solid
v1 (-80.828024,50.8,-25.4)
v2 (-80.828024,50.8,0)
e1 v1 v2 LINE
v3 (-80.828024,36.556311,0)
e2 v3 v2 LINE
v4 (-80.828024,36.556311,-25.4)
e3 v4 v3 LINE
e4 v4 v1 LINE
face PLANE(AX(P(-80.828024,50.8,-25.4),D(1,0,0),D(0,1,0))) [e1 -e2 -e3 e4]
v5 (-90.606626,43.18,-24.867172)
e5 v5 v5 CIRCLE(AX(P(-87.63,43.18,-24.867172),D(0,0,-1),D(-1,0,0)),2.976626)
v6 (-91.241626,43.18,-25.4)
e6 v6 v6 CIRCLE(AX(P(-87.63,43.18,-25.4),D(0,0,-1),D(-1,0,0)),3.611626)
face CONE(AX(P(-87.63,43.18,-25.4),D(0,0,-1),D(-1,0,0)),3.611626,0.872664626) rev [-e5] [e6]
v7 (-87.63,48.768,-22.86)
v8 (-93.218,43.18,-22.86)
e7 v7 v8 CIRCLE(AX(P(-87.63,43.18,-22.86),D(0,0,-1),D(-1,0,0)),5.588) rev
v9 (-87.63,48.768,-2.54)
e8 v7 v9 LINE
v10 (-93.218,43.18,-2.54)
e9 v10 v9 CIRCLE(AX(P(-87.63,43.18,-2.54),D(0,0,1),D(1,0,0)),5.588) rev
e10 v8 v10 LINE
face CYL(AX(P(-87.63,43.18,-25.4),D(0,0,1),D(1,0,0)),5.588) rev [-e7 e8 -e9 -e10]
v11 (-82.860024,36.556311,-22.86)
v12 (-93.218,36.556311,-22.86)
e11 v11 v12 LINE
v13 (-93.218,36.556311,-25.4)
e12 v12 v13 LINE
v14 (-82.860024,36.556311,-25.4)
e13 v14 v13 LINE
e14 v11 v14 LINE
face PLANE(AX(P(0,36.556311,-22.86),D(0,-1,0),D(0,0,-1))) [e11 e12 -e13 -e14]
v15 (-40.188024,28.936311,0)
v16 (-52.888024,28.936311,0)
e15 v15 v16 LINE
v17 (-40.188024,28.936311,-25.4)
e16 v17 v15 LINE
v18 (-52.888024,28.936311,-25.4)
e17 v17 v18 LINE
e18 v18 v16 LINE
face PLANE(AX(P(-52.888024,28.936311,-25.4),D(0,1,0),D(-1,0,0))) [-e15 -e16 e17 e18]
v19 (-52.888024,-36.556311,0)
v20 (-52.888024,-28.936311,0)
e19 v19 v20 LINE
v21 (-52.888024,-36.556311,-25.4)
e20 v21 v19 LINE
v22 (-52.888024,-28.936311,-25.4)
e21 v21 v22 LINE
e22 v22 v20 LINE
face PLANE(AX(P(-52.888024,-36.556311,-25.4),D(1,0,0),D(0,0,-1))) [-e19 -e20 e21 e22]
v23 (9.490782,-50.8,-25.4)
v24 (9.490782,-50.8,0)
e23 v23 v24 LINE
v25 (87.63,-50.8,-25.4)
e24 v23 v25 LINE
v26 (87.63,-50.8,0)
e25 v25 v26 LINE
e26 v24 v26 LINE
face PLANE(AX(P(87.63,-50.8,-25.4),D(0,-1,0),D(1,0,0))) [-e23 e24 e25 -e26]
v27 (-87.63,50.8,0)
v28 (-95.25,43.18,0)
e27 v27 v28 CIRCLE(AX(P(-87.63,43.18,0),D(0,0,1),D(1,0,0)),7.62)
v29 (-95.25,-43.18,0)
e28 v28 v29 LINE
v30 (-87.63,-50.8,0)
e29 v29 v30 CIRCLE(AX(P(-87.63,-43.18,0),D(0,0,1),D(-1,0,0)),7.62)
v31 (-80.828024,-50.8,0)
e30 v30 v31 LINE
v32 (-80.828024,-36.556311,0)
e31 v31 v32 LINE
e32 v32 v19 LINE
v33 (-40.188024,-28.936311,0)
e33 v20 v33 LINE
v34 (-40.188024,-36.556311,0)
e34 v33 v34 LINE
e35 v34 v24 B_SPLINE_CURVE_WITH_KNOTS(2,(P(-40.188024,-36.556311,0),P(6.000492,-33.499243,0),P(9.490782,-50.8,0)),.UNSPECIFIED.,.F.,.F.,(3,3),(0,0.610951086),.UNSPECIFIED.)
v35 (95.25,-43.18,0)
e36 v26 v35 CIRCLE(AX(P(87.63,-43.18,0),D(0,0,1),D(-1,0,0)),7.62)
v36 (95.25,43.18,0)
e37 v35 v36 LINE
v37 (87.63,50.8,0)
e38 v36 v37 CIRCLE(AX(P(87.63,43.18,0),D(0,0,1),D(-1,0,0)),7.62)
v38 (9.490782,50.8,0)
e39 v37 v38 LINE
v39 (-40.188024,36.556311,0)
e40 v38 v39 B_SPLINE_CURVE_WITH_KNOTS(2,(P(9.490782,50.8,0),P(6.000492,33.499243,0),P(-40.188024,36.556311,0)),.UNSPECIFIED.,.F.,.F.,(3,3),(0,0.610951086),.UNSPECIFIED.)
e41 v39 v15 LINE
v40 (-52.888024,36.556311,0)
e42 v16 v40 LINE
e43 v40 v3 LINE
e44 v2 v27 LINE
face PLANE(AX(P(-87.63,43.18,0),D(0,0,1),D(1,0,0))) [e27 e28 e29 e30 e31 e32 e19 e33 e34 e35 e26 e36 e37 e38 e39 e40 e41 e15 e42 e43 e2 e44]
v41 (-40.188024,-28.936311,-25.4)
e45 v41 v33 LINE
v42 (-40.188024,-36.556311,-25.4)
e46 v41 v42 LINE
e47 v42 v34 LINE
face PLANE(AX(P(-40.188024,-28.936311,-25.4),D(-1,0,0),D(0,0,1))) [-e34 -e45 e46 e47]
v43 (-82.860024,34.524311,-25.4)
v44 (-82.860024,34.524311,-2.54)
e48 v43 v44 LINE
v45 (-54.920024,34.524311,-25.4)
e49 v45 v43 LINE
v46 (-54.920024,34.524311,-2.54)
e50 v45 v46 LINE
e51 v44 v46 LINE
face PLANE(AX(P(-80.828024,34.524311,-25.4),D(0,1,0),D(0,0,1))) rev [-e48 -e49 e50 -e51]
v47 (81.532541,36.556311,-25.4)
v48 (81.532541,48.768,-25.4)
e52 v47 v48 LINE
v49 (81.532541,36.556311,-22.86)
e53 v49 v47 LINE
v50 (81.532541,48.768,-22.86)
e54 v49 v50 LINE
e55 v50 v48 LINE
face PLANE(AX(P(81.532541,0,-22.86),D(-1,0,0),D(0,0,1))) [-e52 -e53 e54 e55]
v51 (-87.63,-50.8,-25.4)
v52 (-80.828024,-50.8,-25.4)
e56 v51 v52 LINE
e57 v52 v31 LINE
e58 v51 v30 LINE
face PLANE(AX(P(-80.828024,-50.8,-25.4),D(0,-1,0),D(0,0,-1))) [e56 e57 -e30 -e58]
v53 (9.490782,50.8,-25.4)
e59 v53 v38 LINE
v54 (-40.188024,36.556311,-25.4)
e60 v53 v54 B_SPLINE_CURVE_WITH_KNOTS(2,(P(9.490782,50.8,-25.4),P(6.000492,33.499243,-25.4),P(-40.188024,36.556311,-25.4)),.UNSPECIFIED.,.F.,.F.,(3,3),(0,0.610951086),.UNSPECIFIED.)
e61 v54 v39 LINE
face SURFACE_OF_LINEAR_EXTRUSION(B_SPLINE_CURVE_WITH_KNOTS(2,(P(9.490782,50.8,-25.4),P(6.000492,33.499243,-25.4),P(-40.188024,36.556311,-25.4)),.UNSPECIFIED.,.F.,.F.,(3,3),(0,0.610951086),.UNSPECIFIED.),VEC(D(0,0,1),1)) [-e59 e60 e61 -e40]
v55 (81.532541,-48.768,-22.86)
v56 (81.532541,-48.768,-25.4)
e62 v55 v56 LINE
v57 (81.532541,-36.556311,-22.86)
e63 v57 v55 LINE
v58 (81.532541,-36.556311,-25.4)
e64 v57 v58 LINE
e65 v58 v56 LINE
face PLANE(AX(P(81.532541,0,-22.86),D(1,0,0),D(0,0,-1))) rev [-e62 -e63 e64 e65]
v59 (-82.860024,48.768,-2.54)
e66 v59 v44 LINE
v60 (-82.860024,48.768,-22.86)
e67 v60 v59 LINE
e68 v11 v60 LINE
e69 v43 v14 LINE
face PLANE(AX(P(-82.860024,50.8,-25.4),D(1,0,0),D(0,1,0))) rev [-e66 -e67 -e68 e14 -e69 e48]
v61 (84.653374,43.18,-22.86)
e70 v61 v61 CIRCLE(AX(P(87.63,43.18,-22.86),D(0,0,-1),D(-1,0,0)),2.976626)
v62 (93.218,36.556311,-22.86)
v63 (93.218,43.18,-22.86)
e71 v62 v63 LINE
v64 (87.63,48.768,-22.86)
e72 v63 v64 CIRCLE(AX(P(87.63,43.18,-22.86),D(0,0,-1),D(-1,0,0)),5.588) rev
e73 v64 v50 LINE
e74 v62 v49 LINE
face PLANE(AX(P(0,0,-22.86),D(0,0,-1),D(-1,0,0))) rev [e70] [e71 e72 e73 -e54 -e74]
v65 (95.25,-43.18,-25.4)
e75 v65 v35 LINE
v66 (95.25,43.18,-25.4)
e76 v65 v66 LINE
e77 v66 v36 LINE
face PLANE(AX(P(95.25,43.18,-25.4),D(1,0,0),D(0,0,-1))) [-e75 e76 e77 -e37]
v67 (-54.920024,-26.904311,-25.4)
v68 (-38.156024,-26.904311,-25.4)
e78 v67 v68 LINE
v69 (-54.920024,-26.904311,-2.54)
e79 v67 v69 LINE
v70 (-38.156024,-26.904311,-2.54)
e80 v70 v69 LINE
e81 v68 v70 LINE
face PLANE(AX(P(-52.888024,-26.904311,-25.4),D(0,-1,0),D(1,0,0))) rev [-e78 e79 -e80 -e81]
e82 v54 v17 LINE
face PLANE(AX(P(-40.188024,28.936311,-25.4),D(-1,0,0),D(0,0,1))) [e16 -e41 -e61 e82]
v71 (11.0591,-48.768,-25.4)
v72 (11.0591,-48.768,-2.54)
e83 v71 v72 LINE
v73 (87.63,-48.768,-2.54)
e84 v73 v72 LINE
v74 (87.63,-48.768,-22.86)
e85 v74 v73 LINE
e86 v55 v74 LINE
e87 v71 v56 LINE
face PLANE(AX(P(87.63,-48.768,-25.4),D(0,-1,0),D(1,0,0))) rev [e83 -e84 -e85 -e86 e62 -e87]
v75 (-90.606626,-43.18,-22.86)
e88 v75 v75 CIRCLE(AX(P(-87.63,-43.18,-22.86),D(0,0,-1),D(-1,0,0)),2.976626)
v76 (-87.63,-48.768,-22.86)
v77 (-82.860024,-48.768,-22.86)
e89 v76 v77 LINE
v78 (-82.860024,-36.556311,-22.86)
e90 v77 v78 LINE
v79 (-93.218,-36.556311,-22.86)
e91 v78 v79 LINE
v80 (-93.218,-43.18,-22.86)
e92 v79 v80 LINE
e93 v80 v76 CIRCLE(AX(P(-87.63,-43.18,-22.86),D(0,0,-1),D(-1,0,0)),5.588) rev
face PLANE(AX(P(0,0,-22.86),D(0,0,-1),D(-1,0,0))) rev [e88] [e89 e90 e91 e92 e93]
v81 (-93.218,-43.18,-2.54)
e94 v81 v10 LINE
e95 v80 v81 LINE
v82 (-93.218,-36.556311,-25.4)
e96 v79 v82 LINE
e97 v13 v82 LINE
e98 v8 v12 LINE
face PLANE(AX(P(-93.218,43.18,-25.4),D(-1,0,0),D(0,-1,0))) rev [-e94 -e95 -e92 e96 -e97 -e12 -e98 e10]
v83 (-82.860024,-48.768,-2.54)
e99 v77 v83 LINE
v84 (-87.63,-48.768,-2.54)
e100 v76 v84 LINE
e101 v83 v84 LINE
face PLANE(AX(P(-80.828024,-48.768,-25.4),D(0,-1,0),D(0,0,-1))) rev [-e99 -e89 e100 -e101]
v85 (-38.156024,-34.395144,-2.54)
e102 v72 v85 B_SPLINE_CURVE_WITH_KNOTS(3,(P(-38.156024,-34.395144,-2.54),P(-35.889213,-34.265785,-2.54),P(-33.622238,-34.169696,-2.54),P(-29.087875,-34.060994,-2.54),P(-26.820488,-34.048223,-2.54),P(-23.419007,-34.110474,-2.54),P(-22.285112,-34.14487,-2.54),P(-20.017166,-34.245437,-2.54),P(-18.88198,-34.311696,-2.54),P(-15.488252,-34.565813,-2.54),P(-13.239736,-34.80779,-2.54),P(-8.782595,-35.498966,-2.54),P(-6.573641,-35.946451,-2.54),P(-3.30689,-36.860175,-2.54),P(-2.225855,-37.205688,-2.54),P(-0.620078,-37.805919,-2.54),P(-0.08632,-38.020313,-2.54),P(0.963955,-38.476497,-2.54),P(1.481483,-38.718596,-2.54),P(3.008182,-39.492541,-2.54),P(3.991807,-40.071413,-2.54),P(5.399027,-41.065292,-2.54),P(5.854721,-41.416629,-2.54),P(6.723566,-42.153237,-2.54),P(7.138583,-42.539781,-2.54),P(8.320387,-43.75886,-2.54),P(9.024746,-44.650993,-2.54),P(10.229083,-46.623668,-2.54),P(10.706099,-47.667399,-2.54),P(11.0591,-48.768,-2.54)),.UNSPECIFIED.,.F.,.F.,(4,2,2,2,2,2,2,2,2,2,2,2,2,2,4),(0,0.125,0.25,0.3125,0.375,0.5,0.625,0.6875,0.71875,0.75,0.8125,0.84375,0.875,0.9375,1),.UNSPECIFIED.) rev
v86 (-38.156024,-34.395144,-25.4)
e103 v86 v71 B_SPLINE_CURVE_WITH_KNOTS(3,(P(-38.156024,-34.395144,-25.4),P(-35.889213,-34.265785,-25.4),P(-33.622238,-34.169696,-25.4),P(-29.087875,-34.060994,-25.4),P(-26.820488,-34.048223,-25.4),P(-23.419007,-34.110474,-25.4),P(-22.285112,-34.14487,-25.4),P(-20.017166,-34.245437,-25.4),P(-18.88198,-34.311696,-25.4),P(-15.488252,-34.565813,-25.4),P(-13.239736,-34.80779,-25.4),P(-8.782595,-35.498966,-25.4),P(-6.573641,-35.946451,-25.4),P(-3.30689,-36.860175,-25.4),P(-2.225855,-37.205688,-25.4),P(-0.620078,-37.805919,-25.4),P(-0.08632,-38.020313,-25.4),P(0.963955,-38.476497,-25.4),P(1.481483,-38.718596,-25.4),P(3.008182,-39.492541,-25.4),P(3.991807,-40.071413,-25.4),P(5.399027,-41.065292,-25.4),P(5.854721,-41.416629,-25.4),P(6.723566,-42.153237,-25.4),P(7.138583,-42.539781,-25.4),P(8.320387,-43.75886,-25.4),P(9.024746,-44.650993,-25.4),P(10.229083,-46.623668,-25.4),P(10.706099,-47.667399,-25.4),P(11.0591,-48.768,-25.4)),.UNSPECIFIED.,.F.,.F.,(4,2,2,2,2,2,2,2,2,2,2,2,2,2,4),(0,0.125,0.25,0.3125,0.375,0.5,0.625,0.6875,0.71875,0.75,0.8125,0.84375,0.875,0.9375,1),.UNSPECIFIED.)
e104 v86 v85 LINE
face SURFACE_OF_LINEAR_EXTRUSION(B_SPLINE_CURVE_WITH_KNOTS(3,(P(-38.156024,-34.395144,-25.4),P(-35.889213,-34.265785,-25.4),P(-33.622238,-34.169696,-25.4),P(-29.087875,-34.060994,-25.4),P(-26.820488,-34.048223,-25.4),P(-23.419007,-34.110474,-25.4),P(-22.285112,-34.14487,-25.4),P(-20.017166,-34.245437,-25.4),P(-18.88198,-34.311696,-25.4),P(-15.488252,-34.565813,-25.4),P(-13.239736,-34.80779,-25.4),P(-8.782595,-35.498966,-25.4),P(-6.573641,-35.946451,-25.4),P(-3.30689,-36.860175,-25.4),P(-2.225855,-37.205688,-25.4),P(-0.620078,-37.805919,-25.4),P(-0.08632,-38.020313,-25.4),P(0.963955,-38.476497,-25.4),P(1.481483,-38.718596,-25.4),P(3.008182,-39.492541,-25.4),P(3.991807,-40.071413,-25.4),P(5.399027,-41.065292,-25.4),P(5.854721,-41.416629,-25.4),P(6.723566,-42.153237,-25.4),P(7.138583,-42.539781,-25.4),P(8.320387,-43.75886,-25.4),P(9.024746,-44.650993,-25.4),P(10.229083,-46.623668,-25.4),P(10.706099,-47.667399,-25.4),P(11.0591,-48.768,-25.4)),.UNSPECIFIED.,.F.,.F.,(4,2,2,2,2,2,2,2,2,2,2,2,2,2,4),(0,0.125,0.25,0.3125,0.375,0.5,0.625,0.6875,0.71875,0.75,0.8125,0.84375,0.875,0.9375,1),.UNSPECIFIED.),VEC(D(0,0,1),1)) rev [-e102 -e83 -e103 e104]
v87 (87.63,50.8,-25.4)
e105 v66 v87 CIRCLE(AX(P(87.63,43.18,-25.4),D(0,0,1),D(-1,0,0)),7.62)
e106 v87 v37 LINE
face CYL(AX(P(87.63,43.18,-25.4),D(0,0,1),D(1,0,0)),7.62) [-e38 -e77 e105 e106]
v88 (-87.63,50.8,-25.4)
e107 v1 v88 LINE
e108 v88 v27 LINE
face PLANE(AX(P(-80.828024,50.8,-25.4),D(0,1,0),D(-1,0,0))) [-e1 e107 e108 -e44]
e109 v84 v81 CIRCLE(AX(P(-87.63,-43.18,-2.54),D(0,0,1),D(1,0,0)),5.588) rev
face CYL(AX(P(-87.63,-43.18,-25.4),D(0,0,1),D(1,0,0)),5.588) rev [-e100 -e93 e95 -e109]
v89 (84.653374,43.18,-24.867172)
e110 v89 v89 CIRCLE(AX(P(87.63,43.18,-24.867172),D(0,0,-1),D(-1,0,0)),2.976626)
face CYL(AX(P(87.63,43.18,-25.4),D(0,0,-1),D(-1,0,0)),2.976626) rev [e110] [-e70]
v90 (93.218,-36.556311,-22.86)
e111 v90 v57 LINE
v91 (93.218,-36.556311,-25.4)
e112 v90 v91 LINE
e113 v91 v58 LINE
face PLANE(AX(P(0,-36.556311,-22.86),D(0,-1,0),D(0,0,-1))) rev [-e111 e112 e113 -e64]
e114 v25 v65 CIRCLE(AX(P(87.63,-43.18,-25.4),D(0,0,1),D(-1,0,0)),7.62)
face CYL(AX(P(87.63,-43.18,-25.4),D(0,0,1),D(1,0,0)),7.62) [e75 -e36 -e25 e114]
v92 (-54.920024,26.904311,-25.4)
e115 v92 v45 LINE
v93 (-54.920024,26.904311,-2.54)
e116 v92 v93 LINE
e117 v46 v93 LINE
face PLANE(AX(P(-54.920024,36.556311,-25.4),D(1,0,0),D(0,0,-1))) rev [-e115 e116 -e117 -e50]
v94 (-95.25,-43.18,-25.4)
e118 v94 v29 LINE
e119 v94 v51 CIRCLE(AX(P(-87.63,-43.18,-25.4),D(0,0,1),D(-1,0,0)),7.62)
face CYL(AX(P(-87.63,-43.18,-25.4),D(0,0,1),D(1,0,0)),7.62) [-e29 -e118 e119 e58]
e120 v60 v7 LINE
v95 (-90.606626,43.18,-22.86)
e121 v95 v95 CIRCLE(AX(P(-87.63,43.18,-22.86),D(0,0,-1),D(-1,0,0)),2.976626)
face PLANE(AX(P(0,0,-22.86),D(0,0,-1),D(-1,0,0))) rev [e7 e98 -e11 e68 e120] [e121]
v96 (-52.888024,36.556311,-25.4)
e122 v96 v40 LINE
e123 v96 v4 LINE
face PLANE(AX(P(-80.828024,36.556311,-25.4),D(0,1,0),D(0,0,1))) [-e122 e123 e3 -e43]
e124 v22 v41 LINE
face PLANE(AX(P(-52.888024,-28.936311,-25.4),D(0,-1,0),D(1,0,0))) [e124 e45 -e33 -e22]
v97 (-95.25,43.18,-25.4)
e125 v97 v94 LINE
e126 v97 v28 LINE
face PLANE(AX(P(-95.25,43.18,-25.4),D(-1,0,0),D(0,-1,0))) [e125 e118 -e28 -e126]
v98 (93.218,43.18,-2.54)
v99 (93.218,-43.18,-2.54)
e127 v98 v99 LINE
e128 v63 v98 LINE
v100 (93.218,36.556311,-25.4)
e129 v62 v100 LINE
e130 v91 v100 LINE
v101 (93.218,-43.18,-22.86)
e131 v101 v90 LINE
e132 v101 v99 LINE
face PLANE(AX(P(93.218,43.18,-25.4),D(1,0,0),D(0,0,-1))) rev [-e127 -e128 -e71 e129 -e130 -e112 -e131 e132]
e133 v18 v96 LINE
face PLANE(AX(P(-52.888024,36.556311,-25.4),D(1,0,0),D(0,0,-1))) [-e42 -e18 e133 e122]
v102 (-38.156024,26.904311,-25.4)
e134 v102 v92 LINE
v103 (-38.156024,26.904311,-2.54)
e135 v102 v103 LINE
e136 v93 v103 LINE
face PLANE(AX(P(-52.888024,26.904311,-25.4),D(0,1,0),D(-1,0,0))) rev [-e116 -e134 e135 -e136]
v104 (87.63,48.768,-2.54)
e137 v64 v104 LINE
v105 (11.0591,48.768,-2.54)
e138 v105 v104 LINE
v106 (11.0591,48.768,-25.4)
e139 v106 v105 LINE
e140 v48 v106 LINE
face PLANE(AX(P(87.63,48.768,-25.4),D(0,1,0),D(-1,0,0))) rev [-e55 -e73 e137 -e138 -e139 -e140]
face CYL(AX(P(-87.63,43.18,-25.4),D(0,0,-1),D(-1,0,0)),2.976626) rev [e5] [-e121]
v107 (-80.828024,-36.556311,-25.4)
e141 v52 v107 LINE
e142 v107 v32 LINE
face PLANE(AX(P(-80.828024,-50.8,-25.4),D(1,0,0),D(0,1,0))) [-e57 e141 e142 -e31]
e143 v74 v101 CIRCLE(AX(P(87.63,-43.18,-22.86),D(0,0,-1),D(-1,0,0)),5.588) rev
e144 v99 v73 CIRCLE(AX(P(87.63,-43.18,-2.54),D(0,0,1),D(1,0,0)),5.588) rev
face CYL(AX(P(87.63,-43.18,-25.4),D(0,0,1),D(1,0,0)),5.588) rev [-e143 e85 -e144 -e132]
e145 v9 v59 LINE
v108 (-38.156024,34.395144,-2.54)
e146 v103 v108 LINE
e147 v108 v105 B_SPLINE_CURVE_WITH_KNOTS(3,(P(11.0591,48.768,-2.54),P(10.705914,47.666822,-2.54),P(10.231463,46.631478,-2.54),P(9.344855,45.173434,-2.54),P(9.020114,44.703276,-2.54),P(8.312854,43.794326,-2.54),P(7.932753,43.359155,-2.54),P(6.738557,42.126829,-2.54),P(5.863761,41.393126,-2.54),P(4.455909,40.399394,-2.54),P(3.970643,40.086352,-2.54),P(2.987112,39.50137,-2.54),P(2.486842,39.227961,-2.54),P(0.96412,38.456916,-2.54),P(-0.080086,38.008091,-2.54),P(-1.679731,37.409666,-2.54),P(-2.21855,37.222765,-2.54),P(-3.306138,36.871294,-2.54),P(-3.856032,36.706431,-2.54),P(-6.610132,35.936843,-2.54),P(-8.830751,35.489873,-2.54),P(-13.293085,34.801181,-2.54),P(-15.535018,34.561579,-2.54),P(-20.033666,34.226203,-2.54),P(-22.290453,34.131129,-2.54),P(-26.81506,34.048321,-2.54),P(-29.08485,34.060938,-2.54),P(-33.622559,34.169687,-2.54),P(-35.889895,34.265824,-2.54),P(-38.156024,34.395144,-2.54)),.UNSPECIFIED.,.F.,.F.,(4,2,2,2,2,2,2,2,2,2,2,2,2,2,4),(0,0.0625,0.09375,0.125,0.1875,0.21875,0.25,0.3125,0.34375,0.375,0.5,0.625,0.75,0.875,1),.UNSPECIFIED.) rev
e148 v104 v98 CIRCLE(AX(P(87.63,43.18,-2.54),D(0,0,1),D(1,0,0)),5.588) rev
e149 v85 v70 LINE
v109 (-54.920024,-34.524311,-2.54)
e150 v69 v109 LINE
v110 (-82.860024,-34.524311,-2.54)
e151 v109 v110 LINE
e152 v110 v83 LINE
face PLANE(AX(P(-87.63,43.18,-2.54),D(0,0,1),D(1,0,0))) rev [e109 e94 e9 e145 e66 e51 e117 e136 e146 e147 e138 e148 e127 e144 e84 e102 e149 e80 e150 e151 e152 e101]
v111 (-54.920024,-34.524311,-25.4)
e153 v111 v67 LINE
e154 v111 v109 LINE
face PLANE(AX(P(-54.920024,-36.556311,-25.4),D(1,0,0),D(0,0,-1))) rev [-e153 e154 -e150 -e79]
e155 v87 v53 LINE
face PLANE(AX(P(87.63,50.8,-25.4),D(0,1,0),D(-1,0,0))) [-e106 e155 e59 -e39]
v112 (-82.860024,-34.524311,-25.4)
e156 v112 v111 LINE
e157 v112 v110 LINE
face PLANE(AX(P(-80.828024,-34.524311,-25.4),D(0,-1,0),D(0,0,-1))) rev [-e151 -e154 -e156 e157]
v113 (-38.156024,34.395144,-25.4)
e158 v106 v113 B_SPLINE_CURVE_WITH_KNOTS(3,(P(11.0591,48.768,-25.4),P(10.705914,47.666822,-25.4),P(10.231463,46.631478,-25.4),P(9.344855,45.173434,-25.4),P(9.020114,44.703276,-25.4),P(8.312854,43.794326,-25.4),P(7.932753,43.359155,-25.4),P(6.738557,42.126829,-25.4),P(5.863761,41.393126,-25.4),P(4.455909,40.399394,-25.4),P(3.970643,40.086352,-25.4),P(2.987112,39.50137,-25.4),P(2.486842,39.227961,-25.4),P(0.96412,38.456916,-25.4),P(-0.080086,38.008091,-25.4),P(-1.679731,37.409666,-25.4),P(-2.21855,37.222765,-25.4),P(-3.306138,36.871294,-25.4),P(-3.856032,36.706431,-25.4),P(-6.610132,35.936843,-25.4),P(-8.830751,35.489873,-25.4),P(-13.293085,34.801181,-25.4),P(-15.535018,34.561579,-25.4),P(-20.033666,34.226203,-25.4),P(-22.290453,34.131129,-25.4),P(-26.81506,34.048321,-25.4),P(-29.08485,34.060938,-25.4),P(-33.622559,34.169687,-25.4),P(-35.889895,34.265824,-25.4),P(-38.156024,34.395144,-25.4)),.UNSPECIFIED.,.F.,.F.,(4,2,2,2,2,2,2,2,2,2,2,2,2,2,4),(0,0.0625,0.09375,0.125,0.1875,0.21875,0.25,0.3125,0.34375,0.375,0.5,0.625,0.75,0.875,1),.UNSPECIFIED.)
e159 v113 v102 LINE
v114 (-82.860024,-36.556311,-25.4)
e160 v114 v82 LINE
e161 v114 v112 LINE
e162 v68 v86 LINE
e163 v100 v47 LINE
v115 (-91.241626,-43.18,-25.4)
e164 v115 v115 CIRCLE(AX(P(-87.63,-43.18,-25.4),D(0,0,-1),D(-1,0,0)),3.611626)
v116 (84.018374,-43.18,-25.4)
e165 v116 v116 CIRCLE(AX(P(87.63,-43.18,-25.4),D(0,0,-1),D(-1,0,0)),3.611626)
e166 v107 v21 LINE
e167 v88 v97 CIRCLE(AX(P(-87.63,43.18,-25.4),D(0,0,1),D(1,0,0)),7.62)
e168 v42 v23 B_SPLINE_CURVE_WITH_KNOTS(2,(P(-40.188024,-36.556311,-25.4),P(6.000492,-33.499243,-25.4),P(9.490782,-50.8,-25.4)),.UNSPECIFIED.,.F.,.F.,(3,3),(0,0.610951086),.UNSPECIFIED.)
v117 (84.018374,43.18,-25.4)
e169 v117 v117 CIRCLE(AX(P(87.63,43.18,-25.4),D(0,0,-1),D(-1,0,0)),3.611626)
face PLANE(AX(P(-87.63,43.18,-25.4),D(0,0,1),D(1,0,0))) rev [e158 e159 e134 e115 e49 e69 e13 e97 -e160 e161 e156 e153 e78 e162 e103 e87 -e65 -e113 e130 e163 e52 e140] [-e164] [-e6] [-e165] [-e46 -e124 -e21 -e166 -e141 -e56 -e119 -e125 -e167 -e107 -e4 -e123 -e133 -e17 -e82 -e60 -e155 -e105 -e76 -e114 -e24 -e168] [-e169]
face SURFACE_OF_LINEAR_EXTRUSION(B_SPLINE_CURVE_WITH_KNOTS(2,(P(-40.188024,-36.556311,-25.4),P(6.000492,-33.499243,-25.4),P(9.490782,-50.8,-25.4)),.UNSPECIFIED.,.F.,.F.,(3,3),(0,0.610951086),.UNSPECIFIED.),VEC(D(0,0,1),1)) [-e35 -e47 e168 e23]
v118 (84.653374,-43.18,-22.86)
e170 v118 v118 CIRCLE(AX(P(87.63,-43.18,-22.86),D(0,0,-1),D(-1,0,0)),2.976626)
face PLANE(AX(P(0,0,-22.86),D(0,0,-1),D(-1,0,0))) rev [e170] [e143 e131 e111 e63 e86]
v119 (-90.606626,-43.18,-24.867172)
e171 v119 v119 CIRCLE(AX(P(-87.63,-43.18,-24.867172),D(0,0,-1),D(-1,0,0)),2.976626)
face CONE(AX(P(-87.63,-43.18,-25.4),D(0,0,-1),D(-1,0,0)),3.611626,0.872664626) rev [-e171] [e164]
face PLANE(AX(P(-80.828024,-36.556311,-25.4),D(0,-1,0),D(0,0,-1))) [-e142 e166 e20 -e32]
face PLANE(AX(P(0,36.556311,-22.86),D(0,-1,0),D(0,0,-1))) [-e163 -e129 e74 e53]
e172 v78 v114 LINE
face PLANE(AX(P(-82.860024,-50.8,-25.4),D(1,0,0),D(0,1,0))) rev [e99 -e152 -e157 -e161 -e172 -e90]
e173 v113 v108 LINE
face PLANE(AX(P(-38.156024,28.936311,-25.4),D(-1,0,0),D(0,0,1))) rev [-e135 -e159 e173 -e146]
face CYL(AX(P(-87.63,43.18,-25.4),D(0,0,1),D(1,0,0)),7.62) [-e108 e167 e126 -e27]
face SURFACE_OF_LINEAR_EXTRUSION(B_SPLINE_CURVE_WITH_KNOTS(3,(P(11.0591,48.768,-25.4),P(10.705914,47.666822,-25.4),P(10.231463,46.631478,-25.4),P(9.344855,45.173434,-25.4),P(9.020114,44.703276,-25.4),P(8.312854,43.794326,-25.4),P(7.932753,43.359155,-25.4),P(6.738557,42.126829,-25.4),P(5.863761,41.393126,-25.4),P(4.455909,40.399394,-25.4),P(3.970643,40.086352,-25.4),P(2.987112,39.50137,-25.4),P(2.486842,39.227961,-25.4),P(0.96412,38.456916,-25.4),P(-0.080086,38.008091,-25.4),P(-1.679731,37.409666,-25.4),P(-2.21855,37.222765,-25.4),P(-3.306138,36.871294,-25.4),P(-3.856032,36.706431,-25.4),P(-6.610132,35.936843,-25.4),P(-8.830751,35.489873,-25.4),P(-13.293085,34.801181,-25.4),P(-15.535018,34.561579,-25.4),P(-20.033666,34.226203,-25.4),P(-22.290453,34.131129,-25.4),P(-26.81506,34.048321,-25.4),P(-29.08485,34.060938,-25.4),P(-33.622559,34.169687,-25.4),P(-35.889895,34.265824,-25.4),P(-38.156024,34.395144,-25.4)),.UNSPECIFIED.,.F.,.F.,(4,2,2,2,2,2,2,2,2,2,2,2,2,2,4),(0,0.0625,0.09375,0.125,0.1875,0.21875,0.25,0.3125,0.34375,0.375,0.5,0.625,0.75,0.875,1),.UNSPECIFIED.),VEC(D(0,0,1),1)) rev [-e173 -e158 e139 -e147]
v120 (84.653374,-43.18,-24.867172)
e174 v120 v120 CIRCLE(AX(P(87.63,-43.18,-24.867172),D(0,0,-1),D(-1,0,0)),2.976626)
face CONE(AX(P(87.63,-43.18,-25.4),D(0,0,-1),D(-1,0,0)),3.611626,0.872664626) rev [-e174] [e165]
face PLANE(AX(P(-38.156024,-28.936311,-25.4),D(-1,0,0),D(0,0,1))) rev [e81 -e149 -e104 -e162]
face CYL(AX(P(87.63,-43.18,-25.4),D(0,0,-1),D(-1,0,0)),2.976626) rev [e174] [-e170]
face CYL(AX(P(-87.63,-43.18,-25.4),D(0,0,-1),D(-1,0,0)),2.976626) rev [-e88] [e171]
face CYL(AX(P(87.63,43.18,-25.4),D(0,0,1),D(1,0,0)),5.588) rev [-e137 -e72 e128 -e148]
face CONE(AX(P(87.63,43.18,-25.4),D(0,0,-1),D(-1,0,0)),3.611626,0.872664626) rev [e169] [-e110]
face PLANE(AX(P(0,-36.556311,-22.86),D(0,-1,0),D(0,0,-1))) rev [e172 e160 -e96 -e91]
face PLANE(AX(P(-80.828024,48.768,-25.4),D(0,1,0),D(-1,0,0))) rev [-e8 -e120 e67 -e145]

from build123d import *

# Parameters (mm, degrees)
EXTRUDE_THIN2_START                       = -25.4
EXTRUDE_THIN2_DEPTH                       = 25.4
BOSS_EXTRUDE1_START                       = -2.54
BOSS_EXTRUDE1_DEPTH                       = 2.54
BOSS_EXTRUDE2_DEPTH                       = 2.54
F_15_64_0_23438_DIAMETER_HOLE1_AT_2_COUNT = 2
F_15_64_0_23438_DIAMETER_HOLE1_AT_2_PITCH = 86.36
F_15_64_0_23438_DIAMETER_HOLE1_AT_3_COUNT = 2
F_15_64_0_23438_DIAMETER_HOLE1_AT_3_PITCH = 195.381977675
F_15_64_0_23438_DIAMETER_HOLE1_AT_4_COUNT = 2
F_15_64_0_23438_DIAMETER_HOLE1_AT_4_PITCH = 175.26


# Read off the part's stored shape, not the designer's step: Extrude-Thin2
with BuildPart() as part:
    # Extrude-Thin2 outline → Extrude-Thin2 (new body)
    with BuildSketch(Plane.XY.offset(EXTRUDE_THIN2_START)):
        with BuildLine():
            Line((-80.828024073, 36.556311377), (-80.828024073, 50.8))
            Line((-80.828024073, 50.8), (-87.63, 50.8))
            ThreePointArc((-87.63, 50.8), (-93.018153673, 48.568153673), (-95.25, 43.18))
            Line((-95.25, 43.18), (-95.25, -43.18))
            ThreePointArc((-95.25, -43.18), (-93.018153673, -48.568153673), (-87.63, -50.8))
            Line((-87.63, -50.8), (-80.828024073, -50.8))
            Line((-80.828024073, -50.8), (-80.828024073, -36.556311377))
            Line((-80.828024073, -36.556311377), (-52.888024073, -36.556311377))
            Line((-52.888024073, -36.556311377), (-52.888024073, -28.936311377))
            Line((-52.888024073, -28.936311377), (-40.188024073, -28.936311377))
            Line((-40.188024073, -28.936311377), (-40.188024073, -36.556311377))
            add(Edge.make_bspline(
                [(-40.188024073, -36.556311377), (6.000491779, -33.499243365), (9.490782471, -50.8)],
                knots=[0, 0, 0, 0.610951086, 0.610951086, 0.610951086], degree=2))
            Line((9.490782471, -50.8), (87.63, -50.8))
            ThreePointArc((87.63, -50.8), (93.018153673, -48.568153673), (95.25, -43.18))
            Line((95.25, -43.18), (95.25, 43.18))
            ThreePointArc((95.25, 43.18), (93.018153673, 48.568153673), (87.63, 50.8))
            Line((87.63, 50.8), (9.490782471, 50.8))
            add(Edge.make_bspline(
                [(9.490782471, 50.8), (6.000491779, 33.499243365), (-40.188024073, 36.556311377)],
                knots=[0, 0, 0, 0.610951086, 0.610951086, 0.610951086], degree=2))
            Line((-40.188024073, 36.556311377), (-40.188024073, 28.936311377))
            Line((-40.188024073, 28.936311377), (-52.888024073, 28.936311377))
            Line((-52.888024073, 28.936311377), (-52.888024073, 36.556311377))
            Line((-52.888024073, 36.556311377), (-80.828024073, 36.556311377))
        make_face()
        with BuildLine():
            Line((-87.63, 48.768), (-82.860024073, 48.768))
            Line((-82.860024073, 48.768), (-82.860024073, 34.524311377))
            Line((-82.860024073, 34.524311377), (-54.920024073, 34.524311377))
            Line((-54.920024073, 34.524311377), (-54.920024073, 26.904311377))
            Line((-54.920024073, 26.904311377), (-38.156024073, 26.904311377))
            Line((-38.156024073, 26.904311377), (-38.156024073, 34.395144422))
            add(Edge.make_bspline(
                [(11.059099877, 48.768), (10.705913599, 47.666821526), (10.231462505, 46.631478385), (9.34485534, 45.173434414), (9.020114118, 44.703275583), (8.31285443, 43.794325504), (7.932752955, 43.359154617), (6.738556789, 42.126829372), (5.863761314, 41.393125544), (4.455909096, 40.399393999), (3.970643089, 40.086351658), (2.987111557, 39.50137004), (2.48684241, 39.227961499), (0.964119528, 38.456915884), (-0.080085669, 38.008090834), (-1.679731191, 37.409665787), (-2.218549861, 37.222765467), (-3.306137501, 36.871294096), (-3.856031524, 36.7064305), (-6.610131831, 35.936843126), (-8.830751105, 35.489873067), (-13.293085078, 34.801180583), (-15.535017784, 34.561579267), (-20.033665755, 34.226203327), (-22.290452983, 34.13112888), (-26.815059954, 34.048320676), (-29.084850225, 34.060938072), (-33.62255889, 34.169687173), (-35.889894754, 34.26582406), (-38.156024073, 34.395144422)],
                knots=[0, 0, 0, 0, 0.0625, 0.0625, 0.09375, 0.09375, 0.125, 0.125, 0.1875, 0.1875, 0.21875, 0.21875, 0.25, 0.25, 0.3125, 0.3125, 0.34375, 0.34375, 0.375, 0.375, 0.5, 0.5, 0.625, 0.625, 0.75, 0.75, 0.875, 0.875, 1, 1, 1, 1], degree=3))
            Line((11.059099877, 48.768), (87.63, 48.768))
            ThreePointArc((87.63, 48.768), (91.581312693, 47.131312693), (93.218, 43.18))
            Line((93.218, 43.18), (93.218, -43.18))
            ThreePointArc((93.218, -43.18), (91.581312693, -47.131312693), (87.63, -48.768))
            Line((87.63, -48.768), (11.059099877, -48.768))
            add(Edge.make_bspline(
                [(-38.156024073, -34.395144422), (-35.889212951, -34.265785152), (-33.622237618, -34.169696181), (-29.087874945, -34.060993864), (-26.820488385, -34.048222574), (-23.419006743, -34.110473753), (-22.285112177, -34.144870035), (-20.017166217, -34.245437307), (-18.881979516, -34.311696432), (-15.488251882, -34.56581331), (-13.239736034, -34.807790371), (-8.782595463, -35.498966347), (-6.573640775, -35.946451198), (-3.306890482, -36.860175418), (-2.225854522, -37.205688462), (-0.62007844, -37.805919033), (-0.086320204, -38.02031336), (0.963955056, -38.476496538), (1.481482977, -38.71859586), (3.008182433, -39.492540914), (3.991806837, -40.071413071), (5.399027077, -41.06529203), (5.854721193, -41.41662922), (6.723566444, -42.153236805), (7.138582961, -42.539781101), (8.320387349, -43.758860403), (9.024746312, -44.65099332), (10.229082778, -46.623668325), (10.706098691, -47.667398611), (11.059099877, -48.768)],
                knots=[0, 0, 0, 0, 0.125, 0.125, 0.25, 0.25, 0.3125, 0.3125, 0.375, 0.375, 0.5, 0.5, 0.625, 0.625, 0.6875, 0.6875, 0.71875, 0.71875, 0.75, 0.75, 0.8125, 0.8125, 0.84375, 0.84375, 0.875, 0.875, 0.9375, 0.9375, 1, 1, 1, 1], degree=3))
            Line((-38.156024073, -34.395144422), (-38.156024073, -26.904311377))
            Line((-38.156024073, -26.904311377), (-54.920024073, -26.904311377))
            Line((-54.920024073, -26.904311377), (-54.920024073, -34.524311377))
            Line((-54.920024073, -34.524311377), (-82.860024073, -34.524311377))
            Line((-82.860024073, -34.524311377), (-82.860024073, -48.768))
            Line((-82.860024073, -48.768), (-87.63, -48.768))
            ThreePointArc((-87.63, -48.768), (-91.581312693, -47.131312693), (-93.218, -43.18))
            Line((-93.218, -43.18), (-93.218, 43.18))
            ThreePointArc((-93.218, 43.18), (-91.581312693, 47.131312693), (-87.63, 48.768))
        make_face(mode=Mode.SUBTRACT)
    extrude(amount=EXTRUDE_THIN2_DEPTH)

    # Sketch11<2> → Boss-Extrude1 (add)
    with BuildSketch(Plane.XY.offset(BOSS_EXTRUDE1_START)):
        with BuildLine():
            Line((-80.828024073, 50.8), (-80.828024073, 36.556311377))
            Line((-80.828024073, 36.556311377), (-52.888024073, 36.556311377))
            Line((-52.888024073, 36.556311377), (-52.888024073, 28.936311377))
            Line((-52.888024073, 28.936311377), (-40.188024073, 28.936311377))
            Line((-40.188024073, 28.936311377), (-40.188024073, 36.556311377))
            add(Edge.make_bspline(
                [(-40.188024073, 36.556311377), (6.000491779, 33.499243365), (9.490782471, 50.8)],
                knots=[0, 0, 0, 0.610951086, 0.610951086, 0.610951086], degree=2))
            Line((9.490782471, 50.8), (87.63, 50.8))
            ThreePointArc((87.63, 50.8), (93.018153673, 48.568153673), (95.25, 43.18))
            Line((95.25, 43.18), (95.25, -43.18))
            ThreePointArc((95.25, -43.18), (93.018153673, -48.568153673), (87.63, -50.8))
            Line((87.63, -50.8), (9.490782471, -50.8))
            add(Edge.make_bspline(
                [(-40.188024073, -36.556311377), (6.000491779, -33.499243365), (9.490782471, -50.8)],
                knots=[0, 0, 0, 0.610951086, 0.610951086, 0.610951086], degree=2))
            Line((-40.188024073, -36.556311377), (-40.188024073, -28.936311377))
            Line((-40.188024073, -28.936311377), (-52.888024073, -28.936311377))
            Line((-52.888024073, -28.936311377), (-52.888024073, -36.556311377))
            Line((-52.888024073, -36.556311377), (-80.828024073, -36.556311377))
            Line((-80.828024073, -36.556311377), (-80.828024073, -50.8))
            Line((-80.828024073, -50.8), (-87.63, -50.8))
            ThreePointArc((-87.63, -50.8), (-93.018153673, -48.568153673), (-95.25, -43.18))
            Line((-95.25, -43.18), (-95.25, 43.18))
            ThreePointArc((-95.25, 43.18), (-93.018153673, 48.568153673), (-87.63, 50.8))
            Line((-87.63, 50.8), (-80.828024073, 50.8))
        make_face()
    extrude(amount=BOSS_EXTRUDE1_DEPTH)

    # Sketch14 → Boss-Extrude2 (add)
    with BuildSketch(Plane(origin=(0, 0, -25.4), x_dir=(-1, 0, 0), z_dir=(0, 0, -1))):
        with BuildLine():
            ThreePointArc((-95.25, -43.18), (-93.018153673, -48.568153673), (-87.63, -50.8))
            Line((-87.63, -50.8), (-81.532541243, -50.8))
            Line((-81.532541243, -50.8), (-81.532541243, -36.556311377))
            Line((-81.532541243, -36.556311377), (-95.25, -36.556311377))
            Line((-95.25, -36.556311377), (-95.25, -43.18))
        make_face()
        with BuildLine():
            Line((-95.25, 43.18), (-95.25, 36.556311377))
            Line((-95.25, 36.556311377), (-81.532541243, 36.556311377))
            Line((-81.532541243, 36.556311377), (-81.532541243, 50.8))
            Line((-81.532541243, 50.8), (-87.63, 50.8))
            ThreePointArc((-87.63, 50.8), (-93.018153673, 48.568153673), (-95.25, 43.18))
        make_face()
        with BuildLine():
            Line((95.25, -43.18), (95.25, -36.556311377))
            Line((95.25, -36.556311377), (80.828024073, -36.556311377))
            Line((80.828024073, -36.556311377), (80.828024073, -50.8))
            Line((80.828024073, -50.8), (87.63, -50.8))
            ThreePointArc((87.63, -50.8), (93.018153673, -48.568153673), (95.25, -43.18))
        make_face()
        with BuildLine():
            Line((87.63, 50.8), (80.828024073, 50.8))
            Line((80.828024073, 50.8), (80.828024073, 36.556311377))
            Line((80.828024073, 36.556311377), (95.25, 36.556311377))
            Line((95.25, 36.556311377), (95.25, 43.18))
            ThreePointArc((95.25, 43.18), (93.018153673, 48.568153673), (87.63, 50.8))
        make_face()
    extrude(amount=-BOSS_EXTRUDE2_DEPTH)

    # Sketch15 → 15/64 (0.23438) Diameter Hole1 (revolve, cut)
    with BuildSketch(Plane(origin=(87.63, 43.18, -25.4), x_dir=(0, 1, 0), z_dir=(1, 0, 0))):
        Polygon((0, 0), (0, 2.54), (2.976626, 2.54), (2.976626, 0.532828266), (3.611626, 0), align=None)
    f_15_64_0_23438_diameter_hole1 = revolve(axis=Axis((87.63, 43.18, -31.75), (0, 0, 1)), mode=Mode.SUBTRACT)

    # 15/64 (0.23438) Diameter Hole1 at 2: 15/64 (0.23438) Diameter Hole1 ×2
    with Locations(*[(0, -i * F_15_64_0_23438_DIAMETER_HOLE1_AT_2_PITCH, 0) for i in range(1, F_15_64_0_23438_DIAMETER_HOLE1_AT_2_COUNT)]):
        add(f_15_64_0_23438_diameter_hole1, mode=Mode.SUBTRACT)

    # 15/64 (0.23438) Diameter Hole1 at 3: 15/64 (0.23438) Diameter Hole1 ×2
    with Locations(*[Vector(-0.8970121097452229, -0.44200596712083456, 0) * (i * F_15_64_0_23438_DIAMETER_HOLE1_AT_3_PITCH) for i in range(1, F_15_64_0_23438_DIAMETER_HOLE1_AT_3_COUNT)]):
        add(f_15_64_0_23438_diameter_hole1, mode=Mode.SUBTRACT)

    # 15/64 (0.23438) Diameter Hole1 at 4: 15/64 (0.23438) Diameter Hole1 ×2
    with Locations(*[(-i * F_15_64_0_23438_DIAMETER_HOLE1_AT_4_PITCH, 0, 0) for i in range(1, F_15_64_0_23438_DIAMETER_HOLE1_AT_4_COUNT)]):
        add(f_15_64_0_23438_diameter_hole1, mode=Mode.SUBTRACT)


solid = part.part
